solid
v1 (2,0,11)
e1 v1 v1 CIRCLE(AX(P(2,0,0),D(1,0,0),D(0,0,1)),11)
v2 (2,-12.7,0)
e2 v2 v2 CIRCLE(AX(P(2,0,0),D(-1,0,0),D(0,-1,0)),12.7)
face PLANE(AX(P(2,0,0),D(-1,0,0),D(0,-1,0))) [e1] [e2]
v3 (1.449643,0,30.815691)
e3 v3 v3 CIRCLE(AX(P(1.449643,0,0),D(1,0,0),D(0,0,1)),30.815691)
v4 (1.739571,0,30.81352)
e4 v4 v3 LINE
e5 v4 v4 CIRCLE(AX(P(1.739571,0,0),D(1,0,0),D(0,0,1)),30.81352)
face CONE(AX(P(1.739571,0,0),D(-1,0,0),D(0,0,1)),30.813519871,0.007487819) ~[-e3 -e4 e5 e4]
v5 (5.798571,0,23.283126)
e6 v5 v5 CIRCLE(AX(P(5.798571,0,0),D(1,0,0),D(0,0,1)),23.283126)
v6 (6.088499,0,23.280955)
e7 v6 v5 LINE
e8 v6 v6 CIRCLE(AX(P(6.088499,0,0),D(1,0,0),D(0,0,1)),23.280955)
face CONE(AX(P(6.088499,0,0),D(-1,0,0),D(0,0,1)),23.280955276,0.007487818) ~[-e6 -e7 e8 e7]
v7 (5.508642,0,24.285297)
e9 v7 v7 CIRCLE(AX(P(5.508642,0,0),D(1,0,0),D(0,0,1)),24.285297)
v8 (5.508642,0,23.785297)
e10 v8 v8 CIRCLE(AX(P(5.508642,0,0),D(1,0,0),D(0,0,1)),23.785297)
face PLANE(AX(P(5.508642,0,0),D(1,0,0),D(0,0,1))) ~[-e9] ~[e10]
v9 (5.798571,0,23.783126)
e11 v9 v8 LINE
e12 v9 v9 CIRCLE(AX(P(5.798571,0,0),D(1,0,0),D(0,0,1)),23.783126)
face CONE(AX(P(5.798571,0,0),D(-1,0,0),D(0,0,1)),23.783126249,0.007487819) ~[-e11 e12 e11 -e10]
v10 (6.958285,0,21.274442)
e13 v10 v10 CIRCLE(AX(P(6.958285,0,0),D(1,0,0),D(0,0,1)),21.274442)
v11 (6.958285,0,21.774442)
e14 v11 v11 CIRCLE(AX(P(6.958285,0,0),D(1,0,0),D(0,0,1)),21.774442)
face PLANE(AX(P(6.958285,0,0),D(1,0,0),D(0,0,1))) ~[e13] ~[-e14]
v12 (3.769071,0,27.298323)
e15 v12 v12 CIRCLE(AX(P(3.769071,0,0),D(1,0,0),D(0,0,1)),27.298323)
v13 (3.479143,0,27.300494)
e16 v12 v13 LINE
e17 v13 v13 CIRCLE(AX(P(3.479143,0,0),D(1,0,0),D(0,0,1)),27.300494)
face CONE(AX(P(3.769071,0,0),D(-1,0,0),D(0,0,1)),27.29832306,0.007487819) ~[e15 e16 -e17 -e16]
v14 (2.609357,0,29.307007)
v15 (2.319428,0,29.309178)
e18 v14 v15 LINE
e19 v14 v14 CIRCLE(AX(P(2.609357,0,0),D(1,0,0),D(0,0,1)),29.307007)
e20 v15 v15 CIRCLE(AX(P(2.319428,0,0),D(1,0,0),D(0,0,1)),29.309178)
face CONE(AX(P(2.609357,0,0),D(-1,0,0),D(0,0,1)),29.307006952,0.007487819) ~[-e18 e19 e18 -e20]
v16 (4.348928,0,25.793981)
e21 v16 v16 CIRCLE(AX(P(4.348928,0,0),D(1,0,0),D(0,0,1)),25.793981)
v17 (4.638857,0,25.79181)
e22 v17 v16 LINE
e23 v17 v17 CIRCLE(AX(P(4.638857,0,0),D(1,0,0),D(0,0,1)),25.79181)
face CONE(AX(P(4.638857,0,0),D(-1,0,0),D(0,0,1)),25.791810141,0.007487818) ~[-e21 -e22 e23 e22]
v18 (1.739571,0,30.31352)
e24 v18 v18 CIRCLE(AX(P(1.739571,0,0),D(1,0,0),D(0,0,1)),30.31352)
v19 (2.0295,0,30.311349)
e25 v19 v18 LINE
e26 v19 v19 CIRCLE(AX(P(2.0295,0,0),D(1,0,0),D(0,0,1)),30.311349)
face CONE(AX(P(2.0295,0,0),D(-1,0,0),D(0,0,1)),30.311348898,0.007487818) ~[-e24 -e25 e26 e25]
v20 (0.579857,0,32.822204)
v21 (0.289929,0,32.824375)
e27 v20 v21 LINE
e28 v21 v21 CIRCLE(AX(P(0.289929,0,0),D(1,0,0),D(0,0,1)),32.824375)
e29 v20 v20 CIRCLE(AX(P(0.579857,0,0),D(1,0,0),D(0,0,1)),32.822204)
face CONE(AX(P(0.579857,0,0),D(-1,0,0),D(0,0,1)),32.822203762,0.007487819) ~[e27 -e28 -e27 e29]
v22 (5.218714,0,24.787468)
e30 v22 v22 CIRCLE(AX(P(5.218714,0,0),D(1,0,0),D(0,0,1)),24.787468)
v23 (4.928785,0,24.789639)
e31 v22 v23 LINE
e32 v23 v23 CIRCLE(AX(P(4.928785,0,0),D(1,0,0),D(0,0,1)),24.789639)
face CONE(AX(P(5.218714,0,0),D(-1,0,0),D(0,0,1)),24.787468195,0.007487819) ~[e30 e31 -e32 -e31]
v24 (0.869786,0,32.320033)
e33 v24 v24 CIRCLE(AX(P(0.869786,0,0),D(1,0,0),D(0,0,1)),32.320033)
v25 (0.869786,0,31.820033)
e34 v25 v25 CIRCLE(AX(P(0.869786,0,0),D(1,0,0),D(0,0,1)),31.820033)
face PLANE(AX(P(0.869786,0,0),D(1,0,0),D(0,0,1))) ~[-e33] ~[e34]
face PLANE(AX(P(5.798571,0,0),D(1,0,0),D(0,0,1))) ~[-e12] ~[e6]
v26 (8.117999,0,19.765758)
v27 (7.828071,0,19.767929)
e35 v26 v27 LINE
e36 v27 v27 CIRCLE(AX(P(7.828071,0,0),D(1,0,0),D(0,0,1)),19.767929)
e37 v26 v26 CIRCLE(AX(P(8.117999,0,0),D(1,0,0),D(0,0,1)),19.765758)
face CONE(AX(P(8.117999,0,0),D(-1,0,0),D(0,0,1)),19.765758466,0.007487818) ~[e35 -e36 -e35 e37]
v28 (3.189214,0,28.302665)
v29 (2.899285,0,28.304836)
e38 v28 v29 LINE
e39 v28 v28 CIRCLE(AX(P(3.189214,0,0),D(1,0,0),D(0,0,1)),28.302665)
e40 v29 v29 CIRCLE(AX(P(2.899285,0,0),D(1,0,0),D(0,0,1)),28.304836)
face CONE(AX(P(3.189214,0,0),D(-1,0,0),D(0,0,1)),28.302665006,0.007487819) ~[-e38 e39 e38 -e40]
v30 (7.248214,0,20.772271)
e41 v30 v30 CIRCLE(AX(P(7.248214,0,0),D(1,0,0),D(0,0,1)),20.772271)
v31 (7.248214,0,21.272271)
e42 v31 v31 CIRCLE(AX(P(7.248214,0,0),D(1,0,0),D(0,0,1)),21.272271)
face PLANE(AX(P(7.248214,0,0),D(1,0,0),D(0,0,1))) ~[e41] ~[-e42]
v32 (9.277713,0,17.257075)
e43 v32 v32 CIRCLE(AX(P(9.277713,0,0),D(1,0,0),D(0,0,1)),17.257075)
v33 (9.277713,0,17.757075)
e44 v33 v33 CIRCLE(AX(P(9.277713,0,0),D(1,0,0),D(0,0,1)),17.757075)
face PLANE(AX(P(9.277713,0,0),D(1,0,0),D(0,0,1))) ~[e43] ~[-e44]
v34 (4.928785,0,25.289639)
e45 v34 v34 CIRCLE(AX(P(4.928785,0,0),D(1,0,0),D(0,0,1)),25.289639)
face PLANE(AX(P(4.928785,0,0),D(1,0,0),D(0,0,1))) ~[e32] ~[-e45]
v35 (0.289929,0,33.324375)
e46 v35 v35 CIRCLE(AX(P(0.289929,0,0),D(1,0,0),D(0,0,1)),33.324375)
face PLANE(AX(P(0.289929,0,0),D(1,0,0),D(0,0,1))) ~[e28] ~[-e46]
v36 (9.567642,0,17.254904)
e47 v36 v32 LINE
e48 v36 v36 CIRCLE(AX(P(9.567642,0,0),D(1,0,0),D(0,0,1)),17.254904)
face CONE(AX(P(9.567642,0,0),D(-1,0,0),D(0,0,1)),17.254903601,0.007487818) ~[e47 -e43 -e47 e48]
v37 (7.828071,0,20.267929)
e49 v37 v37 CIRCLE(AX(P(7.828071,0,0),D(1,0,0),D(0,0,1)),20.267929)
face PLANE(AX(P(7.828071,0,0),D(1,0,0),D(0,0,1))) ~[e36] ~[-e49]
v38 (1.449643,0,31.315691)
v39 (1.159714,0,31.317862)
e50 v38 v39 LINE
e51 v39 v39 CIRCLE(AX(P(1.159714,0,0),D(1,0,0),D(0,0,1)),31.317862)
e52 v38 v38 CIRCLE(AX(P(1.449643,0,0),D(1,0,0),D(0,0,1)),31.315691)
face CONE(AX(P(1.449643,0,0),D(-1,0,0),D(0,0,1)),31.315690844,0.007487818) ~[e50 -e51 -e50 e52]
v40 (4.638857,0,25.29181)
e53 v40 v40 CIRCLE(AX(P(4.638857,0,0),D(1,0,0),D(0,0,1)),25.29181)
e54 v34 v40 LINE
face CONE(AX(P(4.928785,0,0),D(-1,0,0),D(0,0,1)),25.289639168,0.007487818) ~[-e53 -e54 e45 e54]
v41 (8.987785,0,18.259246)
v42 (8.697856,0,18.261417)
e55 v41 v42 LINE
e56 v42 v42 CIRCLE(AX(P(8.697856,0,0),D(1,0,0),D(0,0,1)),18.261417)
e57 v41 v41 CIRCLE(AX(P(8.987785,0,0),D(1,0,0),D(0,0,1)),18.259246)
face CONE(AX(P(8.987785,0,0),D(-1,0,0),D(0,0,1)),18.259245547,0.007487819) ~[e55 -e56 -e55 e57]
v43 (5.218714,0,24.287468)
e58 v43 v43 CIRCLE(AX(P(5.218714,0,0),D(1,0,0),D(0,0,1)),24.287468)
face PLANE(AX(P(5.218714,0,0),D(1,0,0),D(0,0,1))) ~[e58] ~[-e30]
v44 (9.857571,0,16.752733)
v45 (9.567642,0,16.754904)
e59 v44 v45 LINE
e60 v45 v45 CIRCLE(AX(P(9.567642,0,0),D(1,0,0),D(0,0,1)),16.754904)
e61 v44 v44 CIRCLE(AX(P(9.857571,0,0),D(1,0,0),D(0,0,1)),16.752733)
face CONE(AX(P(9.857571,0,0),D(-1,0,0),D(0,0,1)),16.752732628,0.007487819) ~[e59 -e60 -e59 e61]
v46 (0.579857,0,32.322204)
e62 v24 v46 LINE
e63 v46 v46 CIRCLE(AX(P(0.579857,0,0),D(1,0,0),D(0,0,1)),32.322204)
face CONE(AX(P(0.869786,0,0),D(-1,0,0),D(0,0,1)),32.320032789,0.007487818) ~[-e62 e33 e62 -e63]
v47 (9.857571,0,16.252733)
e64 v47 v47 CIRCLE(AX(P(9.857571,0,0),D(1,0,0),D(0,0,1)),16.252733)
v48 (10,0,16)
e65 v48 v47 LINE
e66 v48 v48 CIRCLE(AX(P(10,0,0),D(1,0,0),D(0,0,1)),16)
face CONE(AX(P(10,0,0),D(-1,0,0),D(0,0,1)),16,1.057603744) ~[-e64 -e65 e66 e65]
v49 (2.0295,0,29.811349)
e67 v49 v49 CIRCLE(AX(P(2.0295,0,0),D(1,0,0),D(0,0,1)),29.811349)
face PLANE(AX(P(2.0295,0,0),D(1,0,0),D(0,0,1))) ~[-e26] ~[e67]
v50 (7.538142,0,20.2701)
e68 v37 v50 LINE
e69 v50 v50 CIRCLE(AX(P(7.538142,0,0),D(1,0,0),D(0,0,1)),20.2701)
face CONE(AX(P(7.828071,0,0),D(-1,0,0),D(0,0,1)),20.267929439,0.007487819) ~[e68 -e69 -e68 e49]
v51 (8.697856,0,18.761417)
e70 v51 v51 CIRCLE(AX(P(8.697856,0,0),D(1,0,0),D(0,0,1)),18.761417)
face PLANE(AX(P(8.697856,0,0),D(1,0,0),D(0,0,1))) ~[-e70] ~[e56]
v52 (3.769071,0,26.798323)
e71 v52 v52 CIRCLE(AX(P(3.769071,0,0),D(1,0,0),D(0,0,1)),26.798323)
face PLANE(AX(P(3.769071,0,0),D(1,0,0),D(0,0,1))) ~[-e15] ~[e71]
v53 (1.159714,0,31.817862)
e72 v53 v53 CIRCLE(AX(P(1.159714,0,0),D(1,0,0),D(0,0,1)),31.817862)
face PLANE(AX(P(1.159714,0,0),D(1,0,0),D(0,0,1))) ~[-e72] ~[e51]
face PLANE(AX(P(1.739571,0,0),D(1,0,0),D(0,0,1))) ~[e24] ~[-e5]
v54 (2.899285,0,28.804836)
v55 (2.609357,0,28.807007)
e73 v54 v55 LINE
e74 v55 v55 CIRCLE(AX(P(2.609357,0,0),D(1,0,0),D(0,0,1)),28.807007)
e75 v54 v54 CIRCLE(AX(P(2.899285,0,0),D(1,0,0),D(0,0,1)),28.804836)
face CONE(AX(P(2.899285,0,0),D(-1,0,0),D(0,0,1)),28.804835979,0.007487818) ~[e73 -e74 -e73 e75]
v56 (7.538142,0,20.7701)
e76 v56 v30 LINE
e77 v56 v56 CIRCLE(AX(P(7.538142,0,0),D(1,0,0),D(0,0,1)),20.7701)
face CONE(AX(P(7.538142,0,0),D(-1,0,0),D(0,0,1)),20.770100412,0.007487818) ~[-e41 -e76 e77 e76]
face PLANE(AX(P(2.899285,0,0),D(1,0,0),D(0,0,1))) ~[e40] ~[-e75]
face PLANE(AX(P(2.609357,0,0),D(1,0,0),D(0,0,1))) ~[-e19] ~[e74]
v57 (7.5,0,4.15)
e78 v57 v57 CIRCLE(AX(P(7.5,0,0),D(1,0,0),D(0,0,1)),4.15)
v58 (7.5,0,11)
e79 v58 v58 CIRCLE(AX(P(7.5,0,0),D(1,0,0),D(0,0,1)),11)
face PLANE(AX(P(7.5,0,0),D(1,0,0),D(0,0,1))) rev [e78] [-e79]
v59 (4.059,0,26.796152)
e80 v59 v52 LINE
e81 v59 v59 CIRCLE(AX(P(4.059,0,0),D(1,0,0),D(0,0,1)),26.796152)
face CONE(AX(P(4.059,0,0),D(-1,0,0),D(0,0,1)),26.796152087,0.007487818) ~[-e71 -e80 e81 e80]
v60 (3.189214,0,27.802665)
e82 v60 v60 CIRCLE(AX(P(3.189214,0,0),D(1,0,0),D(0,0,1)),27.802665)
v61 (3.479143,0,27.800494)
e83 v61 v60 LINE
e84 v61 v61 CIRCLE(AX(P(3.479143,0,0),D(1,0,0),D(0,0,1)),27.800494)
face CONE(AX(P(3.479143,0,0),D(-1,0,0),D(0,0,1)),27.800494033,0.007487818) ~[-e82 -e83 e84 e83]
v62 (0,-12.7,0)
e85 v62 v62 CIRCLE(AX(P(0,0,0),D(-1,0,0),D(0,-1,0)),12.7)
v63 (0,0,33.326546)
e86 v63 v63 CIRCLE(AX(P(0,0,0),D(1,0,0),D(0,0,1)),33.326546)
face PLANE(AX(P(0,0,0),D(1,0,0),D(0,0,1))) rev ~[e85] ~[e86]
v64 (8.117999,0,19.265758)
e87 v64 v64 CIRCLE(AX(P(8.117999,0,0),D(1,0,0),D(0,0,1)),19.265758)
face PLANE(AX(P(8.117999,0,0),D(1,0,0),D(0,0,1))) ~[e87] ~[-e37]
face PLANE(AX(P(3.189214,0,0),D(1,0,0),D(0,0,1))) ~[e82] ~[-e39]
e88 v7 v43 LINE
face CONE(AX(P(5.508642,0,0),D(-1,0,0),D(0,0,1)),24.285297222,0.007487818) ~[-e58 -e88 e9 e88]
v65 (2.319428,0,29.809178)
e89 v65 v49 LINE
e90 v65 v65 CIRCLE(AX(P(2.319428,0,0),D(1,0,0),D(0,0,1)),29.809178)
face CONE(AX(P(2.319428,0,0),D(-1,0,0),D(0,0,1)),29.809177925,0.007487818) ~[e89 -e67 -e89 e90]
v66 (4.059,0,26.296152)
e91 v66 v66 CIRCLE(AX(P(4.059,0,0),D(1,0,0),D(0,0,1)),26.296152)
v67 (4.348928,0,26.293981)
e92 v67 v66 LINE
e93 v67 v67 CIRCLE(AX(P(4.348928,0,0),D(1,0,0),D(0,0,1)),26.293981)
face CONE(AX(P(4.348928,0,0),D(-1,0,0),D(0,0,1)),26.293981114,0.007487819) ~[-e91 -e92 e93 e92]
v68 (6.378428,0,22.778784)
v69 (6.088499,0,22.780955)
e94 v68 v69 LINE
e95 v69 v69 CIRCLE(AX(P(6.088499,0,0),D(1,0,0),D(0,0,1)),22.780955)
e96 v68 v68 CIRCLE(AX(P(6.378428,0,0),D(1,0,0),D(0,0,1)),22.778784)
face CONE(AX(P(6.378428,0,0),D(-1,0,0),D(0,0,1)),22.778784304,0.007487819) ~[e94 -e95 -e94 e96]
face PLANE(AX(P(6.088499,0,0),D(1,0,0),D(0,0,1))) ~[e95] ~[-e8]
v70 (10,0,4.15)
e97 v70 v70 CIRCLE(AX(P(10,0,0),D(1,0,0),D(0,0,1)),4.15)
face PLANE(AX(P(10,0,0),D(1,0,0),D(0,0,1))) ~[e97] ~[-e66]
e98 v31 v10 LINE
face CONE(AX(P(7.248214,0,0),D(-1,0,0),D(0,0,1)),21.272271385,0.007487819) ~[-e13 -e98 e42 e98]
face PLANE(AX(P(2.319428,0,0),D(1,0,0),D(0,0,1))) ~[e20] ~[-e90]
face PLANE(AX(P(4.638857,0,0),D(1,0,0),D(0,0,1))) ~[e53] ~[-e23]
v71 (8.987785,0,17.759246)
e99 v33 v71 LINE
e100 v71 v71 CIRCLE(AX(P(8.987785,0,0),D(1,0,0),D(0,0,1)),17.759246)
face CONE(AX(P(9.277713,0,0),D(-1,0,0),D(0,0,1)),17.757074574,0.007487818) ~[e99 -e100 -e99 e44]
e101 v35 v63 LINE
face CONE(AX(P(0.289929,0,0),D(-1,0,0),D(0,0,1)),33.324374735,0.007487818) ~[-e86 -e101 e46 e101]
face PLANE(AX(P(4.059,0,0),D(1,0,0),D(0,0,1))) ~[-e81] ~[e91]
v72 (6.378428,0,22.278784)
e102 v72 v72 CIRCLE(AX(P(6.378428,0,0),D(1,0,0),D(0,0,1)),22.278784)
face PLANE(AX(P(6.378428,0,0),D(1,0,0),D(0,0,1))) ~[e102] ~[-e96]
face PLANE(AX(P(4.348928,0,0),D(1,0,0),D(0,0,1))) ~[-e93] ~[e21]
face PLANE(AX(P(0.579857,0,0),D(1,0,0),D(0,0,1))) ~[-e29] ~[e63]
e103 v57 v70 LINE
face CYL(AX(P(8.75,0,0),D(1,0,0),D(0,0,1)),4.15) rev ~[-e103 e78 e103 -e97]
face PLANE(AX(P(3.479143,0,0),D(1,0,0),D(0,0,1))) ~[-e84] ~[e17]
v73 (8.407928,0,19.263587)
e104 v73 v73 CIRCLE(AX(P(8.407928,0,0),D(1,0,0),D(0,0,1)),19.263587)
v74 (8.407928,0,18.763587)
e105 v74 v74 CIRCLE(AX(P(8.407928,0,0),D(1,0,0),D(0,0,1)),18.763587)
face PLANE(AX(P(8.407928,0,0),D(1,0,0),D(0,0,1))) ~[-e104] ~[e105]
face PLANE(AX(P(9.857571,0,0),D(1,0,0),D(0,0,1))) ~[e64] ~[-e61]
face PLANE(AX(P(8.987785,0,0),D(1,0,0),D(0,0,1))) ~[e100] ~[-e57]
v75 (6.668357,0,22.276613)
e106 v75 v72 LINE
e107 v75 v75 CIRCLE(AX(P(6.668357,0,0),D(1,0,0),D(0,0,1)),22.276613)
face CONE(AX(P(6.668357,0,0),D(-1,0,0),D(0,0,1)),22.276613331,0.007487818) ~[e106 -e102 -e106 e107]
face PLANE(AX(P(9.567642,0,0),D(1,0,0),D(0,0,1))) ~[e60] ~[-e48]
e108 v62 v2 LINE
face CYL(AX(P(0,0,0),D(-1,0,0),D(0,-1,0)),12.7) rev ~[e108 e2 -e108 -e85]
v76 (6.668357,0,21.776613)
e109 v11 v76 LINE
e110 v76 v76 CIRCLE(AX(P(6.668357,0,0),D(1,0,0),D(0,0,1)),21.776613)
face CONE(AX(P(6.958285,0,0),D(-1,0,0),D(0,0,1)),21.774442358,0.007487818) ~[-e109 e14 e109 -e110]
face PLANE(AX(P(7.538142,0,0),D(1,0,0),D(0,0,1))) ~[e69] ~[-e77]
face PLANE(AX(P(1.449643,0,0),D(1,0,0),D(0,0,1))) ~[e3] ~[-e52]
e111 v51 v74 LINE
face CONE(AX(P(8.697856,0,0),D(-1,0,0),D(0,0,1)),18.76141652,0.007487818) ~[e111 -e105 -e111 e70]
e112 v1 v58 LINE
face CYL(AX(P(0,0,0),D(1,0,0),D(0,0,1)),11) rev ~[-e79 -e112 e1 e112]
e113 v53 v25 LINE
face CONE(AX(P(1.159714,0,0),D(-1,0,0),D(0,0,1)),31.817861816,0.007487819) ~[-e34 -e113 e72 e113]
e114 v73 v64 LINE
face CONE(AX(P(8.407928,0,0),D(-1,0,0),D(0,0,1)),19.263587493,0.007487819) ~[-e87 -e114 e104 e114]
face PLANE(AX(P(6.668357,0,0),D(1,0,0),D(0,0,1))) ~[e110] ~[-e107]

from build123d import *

# Parameters (mm, degrees)
F1_W     = 2.5
F1_H     = 6.85
F3_R     = 12.7
F3_R_2   = 11
F4_DEPTH = 2


# Not quite as in the source:
# - a feature names something its author has since deleted; it is built from what else it names


with BuildPart() as f2:
    # F1 (on Front) → F2 (revolve)
    with BuildSketch(Plane.XZ):
        Polygon((0, 33.3265457083), (0, 11), (7.5, 11), (10, 11), (10, 16), (9.8575705779, 16.2527326282), (9.8575705779, 16.7527326282), (9.5676420315, 16.7549036012), (9.5676420315, 17.2549036012), (9.2777134851, 17.2570745741), (9.2777134851, 17.7570745741), (8.9877849387, 17.759245547), (8.9877849387, 18.259245547), (8.6978563922, 18.26141652), (8.6978563922, 18.76141652), (8.4079278458, 18.7635874929), (8.4079278458, 19.2635874929), (8.1179992994, 19.2657584659), (8.1179992994, 19.7657584659), (7.828070753, 19.7679294388), (7.828070753, 20.2679294388), (7.5381422066, 20.2701004118), (7.5381422066, 20.7701004118), (7.2482136602, 20.7722713847), (7.2482136602, 21.2722713847), (6.9582851138, 21.2744423577), (6.9582851138, 21.7744423577), (6.6683565674, 21.7766133306), (6.6683565674, 22.2766133306), (6.378428021, 22.2787843035), (6.378428021, 22.7787843035), (6.0884994746, 22.7809552765), (6.0884994746, 23.2809552765), (5.7985709282, 23.2831262494), (5.7985709282, 23.7831262494), (5.5086423818, 23.7852972224), (5.5086423818, 24.2852972224), (5.2187138353, 24.2874681953), (5.2187138353, 24.7874681953), (4.9287852889, 24.7896391683), (4.9287852889, 25.2896391683), (4.6388567425, 25.2918101412), (4.6388567425, 25.7918101412), (4.3489281961, 25.7939811141), (4.3489281961, 26.2939811141), (4.0589996497, 26.2961520871), (4.0589996497, 26.7961520871), (3.7690711033, 26.79832306), (3.7690711033, 27.29832306), (3.4791425569, 27.300494033), (3.4791425569, 27.800494033), (3.1892140105, 27.8026650059), (3.1892140105, 28.3026650059), (2.8992854641, 28.3048359789), (2.8992854641, 28.8048359789), (2.6093569177, 28.8070069518), (2.6093569177, 29.3070069518), (2.3194283713, 29.3091779248), (2.3194283713, 29.8091779248), (2.0294998249, 29.8113488977), (2.0294998249, 30.3113488977), (1.7395712784, 30.3135198706), (1.7395712784, 30.8135198706), (1.449642732, 30.8156908436), (1.449642732, 31.3156908436), (1.1597141856, 31.3178618165), (1.1597141856, 31.8178618165), (0.8697856392, 31.8200327895), (0.8697856392, 32.3200327895), (0.5798570928, 32.3222037624), (0.5798570928, 32.8222037624), (0.2899285464, 32.8243747354), (0.2899285464, 33.3243747354), align=None)
        with Locations((8.75, 7.575)):
            Rectangle(F1_W, F1_H)
    revolve(axis=Axis((0, 0, 0), (1, 0, 0)))

    # F3 (on face) → F4 (cut)
    with BuildSketch(Plane(origin=(0, 0, 0), x_dir=(0, -1, 0), z_dir=(-1, 0, 0))):
        Circle(F3_R)
        Circle(F3_R_2, mode=Mode.SUBTRACT)
    extrude(amount=-F4_DEPTH, mode=Mode.SUBTRACT)


solid = f2.part
